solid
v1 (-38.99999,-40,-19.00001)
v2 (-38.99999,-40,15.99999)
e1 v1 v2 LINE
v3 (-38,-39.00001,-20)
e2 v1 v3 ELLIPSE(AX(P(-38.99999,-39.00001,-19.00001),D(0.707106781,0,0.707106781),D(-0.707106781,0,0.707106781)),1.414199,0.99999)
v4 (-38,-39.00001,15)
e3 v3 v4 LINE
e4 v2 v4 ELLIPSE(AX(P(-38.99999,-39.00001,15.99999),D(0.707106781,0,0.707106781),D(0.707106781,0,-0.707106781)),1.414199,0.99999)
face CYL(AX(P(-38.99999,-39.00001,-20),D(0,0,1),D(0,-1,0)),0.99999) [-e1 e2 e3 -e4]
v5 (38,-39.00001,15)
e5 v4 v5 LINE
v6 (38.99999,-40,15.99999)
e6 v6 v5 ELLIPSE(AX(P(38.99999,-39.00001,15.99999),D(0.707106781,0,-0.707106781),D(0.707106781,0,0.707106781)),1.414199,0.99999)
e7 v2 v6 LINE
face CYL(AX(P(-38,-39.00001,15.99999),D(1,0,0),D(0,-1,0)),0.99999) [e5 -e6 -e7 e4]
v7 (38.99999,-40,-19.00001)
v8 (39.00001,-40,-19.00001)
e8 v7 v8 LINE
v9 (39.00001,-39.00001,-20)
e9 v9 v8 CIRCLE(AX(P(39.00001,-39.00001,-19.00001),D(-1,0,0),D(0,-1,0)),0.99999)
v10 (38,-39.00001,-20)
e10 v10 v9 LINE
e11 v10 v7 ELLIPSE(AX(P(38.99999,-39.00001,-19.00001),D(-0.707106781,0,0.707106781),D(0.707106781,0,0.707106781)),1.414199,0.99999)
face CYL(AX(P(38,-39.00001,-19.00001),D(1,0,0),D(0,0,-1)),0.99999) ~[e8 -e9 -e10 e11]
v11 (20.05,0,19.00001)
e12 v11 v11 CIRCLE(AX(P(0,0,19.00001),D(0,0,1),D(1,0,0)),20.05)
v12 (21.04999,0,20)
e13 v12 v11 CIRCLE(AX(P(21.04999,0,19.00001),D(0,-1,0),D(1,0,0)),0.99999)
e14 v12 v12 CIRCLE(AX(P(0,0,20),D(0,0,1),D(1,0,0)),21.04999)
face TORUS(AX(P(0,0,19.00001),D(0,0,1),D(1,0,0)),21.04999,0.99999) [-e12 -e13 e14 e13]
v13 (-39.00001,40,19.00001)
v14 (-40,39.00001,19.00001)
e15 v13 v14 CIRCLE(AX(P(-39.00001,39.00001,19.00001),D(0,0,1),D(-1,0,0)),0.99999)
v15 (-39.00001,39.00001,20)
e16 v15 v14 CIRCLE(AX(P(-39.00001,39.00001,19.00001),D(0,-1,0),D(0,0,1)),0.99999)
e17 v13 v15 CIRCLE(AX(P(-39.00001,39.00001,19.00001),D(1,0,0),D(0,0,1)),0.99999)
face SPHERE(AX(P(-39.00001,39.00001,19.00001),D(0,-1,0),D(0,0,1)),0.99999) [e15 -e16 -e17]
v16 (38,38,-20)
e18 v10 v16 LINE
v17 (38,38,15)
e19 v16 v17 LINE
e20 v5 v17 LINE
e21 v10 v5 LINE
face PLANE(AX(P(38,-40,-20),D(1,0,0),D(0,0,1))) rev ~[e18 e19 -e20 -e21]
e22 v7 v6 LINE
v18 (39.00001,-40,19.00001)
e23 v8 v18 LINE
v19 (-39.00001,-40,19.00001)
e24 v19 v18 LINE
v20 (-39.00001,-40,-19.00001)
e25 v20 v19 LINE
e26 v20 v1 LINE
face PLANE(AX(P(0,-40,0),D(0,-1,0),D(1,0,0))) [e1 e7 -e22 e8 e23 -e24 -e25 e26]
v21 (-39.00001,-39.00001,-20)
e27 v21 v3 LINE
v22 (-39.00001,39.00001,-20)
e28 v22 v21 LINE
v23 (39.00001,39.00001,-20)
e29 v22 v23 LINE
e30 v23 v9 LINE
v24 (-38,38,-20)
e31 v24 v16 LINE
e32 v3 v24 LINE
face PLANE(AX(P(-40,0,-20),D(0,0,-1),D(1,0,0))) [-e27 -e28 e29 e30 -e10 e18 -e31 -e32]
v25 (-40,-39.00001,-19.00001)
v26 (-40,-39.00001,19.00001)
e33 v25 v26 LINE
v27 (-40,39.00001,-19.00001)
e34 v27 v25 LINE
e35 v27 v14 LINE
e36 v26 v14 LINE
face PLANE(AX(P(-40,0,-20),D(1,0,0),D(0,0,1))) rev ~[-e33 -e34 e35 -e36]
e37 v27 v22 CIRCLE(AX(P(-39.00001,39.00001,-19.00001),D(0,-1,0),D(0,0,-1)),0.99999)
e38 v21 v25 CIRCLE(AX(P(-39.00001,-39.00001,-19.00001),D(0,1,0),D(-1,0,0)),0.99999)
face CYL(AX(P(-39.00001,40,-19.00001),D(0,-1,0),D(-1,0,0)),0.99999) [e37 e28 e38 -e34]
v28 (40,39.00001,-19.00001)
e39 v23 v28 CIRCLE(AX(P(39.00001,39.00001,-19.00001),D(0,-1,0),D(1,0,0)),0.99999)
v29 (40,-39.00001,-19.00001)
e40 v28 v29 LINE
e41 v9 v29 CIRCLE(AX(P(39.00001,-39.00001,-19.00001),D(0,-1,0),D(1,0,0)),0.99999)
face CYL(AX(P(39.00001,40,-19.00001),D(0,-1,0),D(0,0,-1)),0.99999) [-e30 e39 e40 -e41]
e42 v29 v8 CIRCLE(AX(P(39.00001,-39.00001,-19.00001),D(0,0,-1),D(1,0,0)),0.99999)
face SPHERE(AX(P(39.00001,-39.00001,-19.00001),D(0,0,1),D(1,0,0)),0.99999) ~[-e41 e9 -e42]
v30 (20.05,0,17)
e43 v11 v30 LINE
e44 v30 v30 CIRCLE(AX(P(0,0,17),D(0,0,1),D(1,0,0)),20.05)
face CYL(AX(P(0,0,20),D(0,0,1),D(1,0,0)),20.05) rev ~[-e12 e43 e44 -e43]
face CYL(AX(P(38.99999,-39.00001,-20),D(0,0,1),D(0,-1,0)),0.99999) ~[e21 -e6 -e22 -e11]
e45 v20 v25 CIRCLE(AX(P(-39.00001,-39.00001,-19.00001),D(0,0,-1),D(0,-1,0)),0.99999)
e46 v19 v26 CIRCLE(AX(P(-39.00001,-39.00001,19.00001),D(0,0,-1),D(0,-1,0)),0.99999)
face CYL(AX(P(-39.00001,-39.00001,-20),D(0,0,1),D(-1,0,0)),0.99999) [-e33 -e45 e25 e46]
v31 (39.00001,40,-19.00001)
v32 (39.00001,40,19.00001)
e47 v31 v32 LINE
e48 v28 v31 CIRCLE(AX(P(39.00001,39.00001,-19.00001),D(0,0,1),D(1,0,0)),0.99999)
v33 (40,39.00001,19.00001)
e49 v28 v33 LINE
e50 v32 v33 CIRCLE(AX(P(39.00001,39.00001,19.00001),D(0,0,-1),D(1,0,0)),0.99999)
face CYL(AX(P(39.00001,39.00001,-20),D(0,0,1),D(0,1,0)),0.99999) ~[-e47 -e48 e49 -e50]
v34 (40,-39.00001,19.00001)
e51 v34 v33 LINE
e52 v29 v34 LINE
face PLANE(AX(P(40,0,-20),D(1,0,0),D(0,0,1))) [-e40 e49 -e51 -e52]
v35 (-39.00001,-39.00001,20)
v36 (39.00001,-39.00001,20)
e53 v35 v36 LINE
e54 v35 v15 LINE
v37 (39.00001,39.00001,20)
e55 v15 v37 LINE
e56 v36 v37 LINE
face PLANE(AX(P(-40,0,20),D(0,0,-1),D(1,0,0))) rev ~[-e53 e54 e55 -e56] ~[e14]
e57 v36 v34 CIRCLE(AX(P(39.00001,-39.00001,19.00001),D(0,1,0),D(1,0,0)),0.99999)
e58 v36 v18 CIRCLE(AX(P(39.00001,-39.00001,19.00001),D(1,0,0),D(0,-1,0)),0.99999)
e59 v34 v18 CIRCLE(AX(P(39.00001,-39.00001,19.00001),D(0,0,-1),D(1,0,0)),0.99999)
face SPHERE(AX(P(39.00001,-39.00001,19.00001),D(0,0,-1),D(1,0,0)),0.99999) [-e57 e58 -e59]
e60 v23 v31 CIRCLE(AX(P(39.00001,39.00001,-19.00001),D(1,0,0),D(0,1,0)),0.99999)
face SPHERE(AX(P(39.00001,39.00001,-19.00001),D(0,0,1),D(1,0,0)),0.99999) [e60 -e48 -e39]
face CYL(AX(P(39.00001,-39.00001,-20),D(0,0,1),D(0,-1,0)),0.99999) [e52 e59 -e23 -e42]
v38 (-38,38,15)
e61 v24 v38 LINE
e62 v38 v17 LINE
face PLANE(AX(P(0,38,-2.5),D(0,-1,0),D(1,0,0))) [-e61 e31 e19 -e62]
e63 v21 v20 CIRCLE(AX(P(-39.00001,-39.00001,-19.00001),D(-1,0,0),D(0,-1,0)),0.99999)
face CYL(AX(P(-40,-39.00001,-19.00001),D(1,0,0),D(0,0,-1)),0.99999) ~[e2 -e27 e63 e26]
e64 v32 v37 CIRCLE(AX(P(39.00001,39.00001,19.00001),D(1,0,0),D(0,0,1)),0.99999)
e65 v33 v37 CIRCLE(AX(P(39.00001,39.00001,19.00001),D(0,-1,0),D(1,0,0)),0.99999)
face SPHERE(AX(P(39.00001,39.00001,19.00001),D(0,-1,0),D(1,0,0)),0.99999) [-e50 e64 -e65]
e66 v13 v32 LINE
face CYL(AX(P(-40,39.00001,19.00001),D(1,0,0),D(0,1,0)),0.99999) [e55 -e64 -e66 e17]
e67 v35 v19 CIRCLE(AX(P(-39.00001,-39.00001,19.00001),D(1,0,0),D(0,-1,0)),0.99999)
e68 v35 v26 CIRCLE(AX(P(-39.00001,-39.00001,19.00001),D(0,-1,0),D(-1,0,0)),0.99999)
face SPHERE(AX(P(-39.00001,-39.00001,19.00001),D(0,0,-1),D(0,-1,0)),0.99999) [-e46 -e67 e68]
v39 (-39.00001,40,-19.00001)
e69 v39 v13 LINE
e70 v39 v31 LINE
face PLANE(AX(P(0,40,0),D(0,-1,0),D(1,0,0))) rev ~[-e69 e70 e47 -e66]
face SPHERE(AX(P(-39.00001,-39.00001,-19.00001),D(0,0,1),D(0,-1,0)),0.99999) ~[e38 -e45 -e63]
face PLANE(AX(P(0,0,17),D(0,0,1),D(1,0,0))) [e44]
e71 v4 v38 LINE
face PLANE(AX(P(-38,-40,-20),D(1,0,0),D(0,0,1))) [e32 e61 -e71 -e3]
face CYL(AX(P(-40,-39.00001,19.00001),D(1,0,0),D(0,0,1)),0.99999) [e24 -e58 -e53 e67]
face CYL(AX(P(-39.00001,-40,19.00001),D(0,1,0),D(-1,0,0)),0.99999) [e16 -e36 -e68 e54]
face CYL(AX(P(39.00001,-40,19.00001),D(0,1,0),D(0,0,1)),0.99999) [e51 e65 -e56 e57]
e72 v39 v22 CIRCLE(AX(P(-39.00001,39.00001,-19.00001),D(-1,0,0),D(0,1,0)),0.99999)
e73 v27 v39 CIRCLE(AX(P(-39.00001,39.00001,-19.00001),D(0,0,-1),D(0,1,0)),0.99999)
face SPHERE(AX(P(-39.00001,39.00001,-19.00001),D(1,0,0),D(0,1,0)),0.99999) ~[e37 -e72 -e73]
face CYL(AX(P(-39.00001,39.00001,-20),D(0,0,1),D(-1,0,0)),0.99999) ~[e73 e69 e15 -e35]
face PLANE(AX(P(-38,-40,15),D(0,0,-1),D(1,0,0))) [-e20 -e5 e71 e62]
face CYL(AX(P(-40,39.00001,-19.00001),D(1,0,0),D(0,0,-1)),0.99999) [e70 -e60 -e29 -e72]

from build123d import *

# Parameters (mm, degrees)
F0_W          = 80
F0_H          = 40
F1_DEPTH      = 40
F1_DEPTH_BACK = 40
F2_W          = 76
F2_H          = 35
F3_DEPTH      = 78
F4_R          = 20.05
F5_DEPTH      = 3
F6_R          = 0.99999


# Not quite as in the source:
# - a fillet or chamfer is up to 0.001 mm smaller than in the source, because OpenCascade refuses the exact size


with BuildPart() as f1:
    # F0 (on Front) → F1 (new body, two sides)
    with BuildSketch(Plane.XZ) as f1_sk:
        Rectangle(F0_W, F0_H)
    extrude(amount=F1_DEPTH)
    extrude(f1_sk.sketch, amount=-F1_DEPTH_BACK)

    # F2 (on face) → F3 (cut)
    with BuildSketch(Plane.XZ.offset(40)):
        with Locations((0, -2.5)):
            Rectangle(F2_W, F2_H)
    extrude(amount=-F3_DEPTH, mode=Mode.SUBTRACT)

    # F4 (on face) → F5 (cut)
    with BuildSketch(Plane.XY.offset(20)):
        Circle(F4_R)
    extrude(amount=-F5_DEPTH, mode=Mode.SUBTRACT)

    # F6 (radius 1 in the source; OpenCascade refuses exactly that, so slightly less here)
    f6_edges = [f1.edges().sort_by_distance(p)[0] for p in [
        (40, -40, 0),
        (40, 0, 20),
        (40, 40, 0),
        (40, 0, -20),
        (-40, -40, 0),
        (0, -40, 20),
        (39, -40, -20),
        (38, -40, -2.5),
        (0, -40, 15),
        (-38, -40, -2.5),
        (-39, -40, -20),
        (-40, 0, 20),
        (0, 40, 20),
        (-20.05, 0, 20),
        (0, 40, -20),
        (-40, 40, 0),
        (-40, 0, -20),
    ]]
    fillet(f6_edges, radius=F6_R)


solid = f1.part
